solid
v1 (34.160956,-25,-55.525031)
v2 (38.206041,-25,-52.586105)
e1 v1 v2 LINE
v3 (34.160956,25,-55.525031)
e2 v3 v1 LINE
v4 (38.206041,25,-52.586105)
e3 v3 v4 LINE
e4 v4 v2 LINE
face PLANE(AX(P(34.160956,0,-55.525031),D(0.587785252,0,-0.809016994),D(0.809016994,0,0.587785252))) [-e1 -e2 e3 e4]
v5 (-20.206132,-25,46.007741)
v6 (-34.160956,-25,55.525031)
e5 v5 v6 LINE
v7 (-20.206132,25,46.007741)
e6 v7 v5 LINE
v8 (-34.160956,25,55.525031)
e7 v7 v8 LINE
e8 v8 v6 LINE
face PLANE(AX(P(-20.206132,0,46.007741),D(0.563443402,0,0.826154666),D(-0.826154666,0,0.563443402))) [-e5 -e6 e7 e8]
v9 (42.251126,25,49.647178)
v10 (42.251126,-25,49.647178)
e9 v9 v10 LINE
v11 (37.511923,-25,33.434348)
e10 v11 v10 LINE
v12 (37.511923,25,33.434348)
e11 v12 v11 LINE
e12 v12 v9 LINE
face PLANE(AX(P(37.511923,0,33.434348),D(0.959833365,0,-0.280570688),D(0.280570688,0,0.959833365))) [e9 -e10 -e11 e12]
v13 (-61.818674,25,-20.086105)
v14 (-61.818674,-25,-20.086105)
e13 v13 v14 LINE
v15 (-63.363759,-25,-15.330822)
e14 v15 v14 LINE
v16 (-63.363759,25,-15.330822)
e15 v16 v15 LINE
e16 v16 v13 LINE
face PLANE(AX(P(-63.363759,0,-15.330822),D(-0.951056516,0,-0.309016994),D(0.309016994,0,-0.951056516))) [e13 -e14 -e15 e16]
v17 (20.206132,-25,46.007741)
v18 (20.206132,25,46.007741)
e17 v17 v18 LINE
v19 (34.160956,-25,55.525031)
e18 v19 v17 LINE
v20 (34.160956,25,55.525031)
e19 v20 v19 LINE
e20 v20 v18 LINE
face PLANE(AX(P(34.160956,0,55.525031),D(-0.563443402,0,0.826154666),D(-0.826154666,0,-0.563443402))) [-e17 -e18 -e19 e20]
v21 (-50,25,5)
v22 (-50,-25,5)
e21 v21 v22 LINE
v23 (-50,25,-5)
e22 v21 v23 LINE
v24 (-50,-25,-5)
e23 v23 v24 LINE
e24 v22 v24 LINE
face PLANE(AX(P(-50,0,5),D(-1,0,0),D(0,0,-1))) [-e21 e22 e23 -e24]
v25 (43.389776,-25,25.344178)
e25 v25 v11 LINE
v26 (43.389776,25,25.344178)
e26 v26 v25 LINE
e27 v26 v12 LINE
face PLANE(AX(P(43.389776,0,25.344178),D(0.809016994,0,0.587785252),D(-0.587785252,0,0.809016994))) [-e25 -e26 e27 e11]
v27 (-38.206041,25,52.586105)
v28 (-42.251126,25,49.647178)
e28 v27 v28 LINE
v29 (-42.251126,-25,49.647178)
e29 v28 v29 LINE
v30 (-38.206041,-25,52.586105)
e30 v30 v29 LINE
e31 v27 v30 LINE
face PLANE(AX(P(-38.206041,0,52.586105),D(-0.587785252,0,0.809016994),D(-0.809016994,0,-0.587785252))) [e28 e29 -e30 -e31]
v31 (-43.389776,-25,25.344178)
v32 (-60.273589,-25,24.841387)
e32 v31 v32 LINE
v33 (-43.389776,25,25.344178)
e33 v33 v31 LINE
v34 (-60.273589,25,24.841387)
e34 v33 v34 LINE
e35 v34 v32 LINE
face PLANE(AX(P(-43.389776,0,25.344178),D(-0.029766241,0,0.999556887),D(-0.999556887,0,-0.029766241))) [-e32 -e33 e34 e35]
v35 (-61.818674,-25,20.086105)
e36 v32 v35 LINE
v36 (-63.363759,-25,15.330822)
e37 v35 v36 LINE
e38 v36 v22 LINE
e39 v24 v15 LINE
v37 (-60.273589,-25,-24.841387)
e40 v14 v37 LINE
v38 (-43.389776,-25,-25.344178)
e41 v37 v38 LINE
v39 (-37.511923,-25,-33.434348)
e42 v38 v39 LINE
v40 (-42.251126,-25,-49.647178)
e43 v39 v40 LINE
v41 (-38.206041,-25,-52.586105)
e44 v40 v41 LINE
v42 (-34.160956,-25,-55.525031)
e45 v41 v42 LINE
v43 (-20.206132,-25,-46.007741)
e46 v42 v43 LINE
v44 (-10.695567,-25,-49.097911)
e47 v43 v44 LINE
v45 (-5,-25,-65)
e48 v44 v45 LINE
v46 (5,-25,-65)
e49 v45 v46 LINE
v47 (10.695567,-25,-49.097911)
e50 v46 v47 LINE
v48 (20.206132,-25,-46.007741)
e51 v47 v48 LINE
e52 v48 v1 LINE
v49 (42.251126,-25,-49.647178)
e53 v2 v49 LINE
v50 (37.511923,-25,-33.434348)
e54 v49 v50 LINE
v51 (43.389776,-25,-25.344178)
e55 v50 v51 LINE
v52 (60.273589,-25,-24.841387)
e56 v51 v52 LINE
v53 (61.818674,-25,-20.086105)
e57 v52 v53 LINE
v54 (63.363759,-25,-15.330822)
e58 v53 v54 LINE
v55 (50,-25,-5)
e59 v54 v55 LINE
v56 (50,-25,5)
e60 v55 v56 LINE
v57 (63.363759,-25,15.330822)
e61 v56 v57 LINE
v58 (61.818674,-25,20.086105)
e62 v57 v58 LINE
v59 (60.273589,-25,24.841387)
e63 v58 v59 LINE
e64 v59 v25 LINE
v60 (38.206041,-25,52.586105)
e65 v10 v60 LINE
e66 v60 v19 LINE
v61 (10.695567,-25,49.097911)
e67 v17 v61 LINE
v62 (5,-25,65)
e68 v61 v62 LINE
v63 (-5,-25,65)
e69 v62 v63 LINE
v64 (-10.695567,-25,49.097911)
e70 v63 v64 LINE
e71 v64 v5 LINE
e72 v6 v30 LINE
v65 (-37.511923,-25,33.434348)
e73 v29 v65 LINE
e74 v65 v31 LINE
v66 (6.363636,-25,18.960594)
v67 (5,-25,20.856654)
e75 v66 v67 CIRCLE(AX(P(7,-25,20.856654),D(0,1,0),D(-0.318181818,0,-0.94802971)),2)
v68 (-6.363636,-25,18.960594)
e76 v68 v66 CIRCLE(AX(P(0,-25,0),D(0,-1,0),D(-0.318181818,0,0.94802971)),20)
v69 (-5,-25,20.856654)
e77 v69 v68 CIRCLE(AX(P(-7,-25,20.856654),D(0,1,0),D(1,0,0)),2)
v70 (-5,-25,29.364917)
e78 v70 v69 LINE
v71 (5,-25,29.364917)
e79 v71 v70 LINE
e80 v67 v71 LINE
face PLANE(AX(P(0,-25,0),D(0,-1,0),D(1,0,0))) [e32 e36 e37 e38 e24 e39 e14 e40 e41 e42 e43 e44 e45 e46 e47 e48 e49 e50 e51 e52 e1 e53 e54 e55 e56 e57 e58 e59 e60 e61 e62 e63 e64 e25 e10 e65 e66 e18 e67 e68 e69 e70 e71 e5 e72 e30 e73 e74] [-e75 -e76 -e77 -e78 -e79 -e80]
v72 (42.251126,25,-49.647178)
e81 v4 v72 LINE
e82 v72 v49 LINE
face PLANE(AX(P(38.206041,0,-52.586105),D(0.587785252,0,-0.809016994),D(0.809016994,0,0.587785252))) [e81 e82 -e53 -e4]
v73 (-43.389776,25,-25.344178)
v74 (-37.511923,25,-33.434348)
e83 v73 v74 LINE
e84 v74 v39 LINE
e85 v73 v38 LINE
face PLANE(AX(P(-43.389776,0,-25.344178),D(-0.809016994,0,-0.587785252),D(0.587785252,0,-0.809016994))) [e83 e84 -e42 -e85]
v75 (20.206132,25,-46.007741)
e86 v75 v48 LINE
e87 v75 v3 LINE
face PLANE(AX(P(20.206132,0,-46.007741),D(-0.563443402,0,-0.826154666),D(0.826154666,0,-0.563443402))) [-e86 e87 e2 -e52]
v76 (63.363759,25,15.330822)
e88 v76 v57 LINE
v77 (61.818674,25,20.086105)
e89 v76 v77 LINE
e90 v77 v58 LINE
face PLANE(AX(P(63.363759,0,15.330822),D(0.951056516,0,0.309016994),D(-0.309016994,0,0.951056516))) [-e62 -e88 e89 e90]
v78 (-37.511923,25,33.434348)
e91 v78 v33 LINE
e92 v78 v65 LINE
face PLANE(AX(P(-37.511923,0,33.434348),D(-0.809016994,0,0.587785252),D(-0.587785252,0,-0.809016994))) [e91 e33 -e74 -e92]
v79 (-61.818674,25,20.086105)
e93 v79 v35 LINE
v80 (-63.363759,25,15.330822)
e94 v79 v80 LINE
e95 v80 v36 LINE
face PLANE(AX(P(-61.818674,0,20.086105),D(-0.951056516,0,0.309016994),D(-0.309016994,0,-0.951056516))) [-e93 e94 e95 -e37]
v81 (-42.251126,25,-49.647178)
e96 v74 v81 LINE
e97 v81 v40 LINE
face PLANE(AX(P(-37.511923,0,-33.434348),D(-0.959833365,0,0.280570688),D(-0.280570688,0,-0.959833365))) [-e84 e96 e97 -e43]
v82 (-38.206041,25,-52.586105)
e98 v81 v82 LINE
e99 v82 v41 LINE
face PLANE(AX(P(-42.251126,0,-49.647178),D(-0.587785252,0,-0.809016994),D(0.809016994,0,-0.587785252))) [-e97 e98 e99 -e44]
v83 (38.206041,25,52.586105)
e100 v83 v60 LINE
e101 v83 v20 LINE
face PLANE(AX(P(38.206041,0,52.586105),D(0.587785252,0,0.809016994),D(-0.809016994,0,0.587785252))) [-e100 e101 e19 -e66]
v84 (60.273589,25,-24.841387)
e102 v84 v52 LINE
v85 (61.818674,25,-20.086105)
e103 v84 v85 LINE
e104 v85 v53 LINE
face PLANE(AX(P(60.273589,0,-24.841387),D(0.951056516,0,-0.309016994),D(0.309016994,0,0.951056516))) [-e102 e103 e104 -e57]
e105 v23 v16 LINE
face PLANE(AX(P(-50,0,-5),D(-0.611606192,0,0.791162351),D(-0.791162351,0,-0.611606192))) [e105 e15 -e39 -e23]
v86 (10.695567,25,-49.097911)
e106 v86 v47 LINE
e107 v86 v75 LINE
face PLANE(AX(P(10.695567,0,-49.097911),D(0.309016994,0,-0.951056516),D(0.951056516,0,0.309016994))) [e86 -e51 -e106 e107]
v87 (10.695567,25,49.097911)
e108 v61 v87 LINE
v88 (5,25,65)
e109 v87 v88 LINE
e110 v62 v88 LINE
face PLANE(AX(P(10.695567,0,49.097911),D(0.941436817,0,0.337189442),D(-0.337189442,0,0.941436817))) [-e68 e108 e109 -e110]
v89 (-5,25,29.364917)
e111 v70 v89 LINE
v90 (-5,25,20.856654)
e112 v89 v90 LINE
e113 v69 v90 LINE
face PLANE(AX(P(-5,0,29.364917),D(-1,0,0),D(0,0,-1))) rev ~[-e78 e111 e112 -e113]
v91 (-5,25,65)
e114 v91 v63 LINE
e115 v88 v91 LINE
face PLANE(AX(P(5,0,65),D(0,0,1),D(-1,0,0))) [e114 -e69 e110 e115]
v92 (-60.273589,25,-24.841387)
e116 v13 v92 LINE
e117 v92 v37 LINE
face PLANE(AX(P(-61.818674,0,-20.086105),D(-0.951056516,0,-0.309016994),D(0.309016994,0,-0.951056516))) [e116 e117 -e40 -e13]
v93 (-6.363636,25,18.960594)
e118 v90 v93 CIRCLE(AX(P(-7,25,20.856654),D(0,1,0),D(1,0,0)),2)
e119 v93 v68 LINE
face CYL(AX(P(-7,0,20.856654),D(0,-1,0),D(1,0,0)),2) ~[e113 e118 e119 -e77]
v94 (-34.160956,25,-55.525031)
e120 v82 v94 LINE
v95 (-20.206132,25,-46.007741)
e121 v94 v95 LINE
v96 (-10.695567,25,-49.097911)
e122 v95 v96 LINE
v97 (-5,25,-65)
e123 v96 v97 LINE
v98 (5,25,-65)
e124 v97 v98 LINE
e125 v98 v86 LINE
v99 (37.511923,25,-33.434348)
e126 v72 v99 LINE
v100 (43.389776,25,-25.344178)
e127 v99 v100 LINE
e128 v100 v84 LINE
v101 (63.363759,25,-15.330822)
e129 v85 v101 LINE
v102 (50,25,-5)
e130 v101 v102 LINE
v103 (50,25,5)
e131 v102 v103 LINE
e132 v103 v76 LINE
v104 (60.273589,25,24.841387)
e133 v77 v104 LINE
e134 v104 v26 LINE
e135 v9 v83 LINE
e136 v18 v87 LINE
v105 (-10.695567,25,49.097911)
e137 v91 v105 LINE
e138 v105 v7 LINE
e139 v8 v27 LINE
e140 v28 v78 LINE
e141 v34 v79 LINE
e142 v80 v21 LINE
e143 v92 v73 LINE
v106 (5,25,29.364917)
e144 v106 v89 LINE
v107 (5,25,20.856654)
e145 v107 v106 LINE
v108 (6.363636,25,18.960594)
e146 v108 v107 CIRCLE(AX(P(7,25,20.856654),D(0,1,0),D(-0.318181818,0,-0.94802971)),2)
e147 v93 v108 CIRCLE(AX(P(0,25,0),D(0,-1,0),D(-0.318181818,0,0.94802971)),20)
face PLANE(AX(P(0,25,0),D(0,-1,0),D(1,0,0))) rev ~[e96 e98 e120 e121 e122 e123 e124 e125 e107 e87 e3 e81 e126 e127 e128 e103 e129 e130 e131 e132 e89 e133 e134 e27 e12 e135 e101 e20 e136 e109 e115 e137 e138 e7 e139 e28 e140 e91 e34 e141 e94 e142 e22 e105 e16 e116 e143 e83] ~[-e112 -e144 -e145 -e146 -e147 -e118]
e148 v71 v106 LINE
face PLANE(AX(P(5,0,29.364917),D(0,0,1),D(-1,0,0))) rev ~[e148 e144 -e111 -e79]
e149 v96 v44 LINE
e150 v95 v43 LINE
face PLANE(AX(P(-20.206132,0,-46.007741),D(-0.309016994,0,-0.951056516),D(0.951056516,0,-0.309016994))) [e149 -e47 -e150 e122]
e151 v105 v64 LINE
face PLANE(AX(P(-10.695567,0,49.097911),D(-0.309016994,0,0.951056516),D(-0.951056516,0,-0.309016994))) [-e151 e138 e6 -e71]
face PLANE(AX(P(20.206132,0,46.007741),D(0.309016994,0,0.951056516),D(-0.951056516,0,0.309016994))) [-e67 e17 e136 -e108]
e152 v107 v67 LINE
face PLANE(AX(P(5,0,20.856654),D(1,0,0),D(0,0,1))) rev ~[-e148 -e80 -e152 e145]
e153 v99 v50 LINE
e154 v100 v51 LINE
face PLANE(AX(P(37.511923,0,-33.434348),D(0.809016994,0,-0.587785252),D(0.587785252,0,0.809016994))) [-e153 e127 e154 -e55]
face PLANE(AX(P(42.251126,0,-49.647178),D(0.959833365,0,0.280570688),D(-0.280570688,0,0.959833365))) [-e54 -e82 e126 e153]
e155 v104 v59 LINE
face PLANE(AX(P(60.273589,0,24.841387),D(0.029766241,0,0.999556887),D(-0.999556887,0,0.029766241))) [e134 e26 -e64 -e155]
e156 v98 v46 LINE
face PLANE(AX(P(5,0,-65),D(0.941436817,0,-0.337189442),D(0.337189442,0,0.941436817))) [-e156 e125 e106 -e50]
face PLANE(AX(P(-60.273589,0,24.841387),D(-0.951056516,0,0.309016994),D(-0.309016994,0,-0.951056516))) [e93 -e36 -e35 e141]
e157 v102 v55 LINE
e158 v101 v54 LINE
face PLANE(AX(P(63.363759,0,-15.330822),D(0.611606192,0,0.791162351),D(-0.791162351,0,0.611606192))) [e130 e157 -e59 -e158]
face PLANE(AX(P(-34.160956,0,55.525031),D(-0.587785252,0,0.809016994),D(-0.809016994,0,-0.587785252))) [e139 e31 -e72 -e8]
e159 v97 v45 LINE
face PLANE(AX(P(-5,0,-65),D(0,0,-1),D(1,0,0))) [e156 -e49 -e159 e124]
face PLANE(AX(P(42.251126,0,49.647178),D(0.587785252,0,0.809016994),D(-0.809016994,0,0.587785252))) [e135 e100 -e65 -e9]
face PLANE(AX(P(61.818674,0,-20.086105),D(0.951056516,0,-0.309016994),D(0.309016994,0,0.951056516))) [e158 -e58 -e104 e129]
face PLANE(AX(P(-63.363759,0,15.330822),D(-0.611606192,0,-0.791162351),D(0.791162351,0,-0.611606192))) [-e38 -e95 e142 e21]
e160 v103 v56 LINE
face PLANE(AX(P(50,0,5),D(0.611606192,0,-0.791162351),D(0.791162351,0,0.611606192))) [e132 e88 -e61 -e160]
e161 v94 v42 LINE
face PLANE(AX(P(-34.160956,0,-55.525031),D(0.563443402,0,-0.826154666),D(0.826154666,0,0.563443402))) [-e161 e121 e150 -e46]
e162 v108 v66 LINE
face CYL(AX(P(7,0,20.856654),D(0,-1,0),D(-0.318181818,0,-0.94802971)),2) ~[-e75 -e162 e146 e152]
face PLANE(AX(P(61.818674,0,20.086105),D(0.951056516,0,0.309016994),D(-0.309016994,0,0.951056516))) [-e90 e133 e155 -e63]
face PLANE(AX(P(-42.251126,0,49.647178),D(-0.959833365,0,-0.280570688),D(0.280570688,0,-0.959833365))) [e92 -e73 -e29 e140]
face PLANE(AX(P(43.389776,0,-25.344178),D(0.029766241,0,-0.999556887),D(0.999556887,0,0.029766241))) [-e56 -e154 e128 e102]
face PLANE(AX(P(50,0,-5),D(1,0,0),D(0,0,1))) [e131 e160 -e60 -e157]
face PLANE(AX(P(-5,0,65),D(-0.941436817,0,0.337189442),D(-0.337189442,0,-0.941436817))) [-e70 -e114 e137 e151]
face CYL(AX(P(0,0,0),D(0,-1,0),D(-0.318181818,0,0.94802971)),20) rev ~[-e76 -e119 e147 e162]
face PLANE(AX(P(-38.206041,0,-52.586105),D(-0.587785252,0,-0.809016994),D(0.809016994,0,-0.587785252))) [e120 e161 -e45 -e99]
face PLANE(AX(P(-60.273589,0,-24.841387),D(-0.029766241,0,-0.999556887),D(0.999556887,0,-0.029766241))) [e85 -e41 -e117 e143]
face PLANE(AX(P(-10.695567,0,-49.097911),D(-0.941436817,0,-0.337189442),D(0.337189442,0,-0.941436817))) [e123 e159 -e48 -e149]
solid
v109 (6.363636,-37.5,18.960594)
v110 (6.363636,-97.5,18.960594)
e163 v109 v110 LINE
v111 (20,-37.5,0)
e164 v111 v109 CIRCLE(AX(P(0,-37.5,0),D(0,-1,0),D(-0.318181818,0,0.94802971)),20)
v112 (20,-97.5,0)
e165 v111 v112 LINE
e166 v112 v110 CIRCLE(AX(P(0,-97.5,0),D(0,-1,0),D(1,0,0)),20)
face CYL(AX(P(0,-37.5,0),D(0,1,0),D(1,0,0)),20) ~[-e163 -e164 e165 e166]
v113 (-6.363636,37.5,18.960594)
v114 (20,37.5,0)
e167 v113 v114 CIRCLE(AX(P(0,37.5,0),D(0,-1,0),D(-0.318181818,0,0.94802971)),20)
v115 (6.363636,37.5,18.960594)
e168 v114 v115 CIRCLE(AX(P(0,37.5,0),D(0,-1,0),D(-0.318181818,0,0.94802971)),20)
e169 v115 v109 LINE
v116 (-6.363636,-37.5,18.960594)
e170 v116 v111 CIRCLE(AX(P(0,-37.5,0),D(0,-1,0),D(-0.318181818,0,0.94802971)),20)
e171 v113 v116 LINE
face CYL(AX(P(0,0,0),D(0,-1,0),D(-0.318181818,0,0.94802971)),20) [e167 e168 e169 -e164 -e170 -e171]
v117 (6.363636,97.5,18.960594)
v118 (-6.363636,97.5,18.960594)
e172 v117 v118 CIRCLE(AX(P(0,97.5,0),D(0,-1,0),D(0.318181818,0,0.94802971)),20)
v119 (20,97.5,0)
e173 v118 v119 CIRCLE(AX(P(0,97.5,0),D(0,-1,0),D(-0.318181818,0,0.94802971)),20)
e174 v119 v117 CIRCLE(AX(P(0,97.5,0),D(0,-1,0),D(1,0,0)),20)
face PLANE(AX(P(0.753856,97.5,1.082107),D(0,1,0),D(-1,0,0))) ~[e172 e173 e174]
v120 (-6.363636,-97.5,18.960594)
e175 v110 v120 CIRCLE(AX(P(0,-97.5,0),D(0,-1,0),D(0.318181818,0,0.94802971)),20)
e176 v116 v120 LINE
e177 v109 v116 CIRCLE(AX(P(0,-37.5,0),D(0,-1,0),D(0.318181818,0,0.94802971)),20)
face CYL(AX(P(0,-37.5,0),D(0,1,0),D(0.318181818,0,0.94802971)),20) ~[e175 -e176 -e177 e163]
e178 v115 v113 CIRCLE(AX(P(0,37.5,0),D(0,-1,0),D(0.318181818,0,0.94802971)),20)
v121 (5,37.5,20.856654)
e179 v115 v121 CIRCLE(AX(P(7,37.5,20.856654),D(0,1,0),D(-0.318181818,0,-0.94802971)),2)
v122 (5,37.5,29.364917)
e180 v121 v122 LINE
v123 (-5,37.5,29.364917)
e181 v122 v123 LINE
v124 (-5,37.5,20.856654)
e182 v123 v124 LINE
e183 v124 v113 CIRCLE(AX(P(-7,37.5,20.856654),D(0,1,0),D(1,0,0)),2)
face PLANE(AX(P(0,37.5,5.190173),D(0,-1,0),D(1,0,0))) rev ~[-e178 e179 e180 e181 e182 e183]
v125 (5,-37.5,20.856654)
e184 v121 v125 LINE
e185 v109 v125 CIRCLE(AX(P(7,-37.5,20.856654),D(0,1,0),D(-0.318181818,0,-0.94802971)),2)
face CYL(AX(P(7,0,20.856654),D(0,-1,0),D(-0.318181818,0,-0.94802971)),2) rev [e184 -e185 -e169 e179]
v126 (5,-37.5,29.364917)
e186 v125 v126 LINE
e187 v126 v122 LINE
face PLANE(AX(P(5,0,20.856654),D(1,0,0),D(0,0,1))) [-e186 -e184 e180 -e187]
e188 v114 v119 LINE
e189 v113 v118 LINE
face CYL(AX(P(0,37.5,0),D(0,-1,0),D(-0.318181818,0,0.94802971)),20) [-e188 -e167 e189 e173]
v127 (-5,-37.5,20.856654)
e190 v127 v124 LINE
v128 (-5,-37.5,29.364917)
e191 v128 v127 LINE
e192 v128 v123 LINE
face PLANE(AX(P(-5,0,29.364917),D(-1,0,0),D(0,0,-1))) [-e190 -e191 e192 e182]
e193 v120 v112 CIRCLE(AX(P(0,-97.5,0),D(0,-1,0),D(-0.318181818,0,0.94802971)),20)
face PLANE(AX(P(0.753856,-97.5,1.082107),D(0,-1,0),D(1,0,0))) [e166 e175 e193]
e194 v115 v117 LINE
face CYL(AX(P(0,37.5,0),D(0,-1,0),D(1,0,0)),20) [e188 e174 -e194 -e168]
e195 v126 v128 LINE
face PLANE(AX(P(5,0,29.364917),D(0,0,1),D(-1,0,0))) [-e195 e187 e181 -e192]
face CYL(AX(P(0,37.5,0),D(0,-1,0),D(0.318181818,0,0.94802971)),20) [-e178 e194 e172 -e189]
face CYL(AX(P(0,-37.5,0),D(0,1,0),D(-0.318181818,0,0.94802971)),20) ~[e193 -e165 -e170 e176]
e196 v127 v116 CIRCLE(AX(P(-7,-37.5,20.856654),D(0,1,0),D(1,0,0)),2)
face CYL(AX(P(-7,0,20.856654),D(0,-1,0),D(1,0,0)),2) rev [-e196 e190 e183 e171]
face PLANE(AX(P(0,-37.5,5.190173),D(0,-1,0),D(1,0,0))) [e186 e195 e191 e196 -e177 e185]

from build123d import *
from build123d import SkipClean  # not in build123d's __all__

# Parameters (mm, degrees)
F1_DEPTH = 25
F3_DEPTH = 25
F4_DEPTH = 37.5
F6_DEPTH = 60


with BuildPart() as f1:
    # F0 (on Front) → F1 (new body, symmetric)
    with BuildSketch(Plane.XZ):
        Polygon((5, 65), (0, 65), (-5, 65), (-10.6955671373, 49.0979107866), (-20.2061323002, 46.0077408429), (-34.1609564271, 55.5250308958), (-38.206041399, 52.5861046344), (-42.2511263709, 49.6471783729), (-37.5119234573, 33.4343475865), (-43.3897759802, 25.3441776427), (-60.2735885873, 24.8413872158), (-61.8186735592, 20.0861046344), (-63.3637585311, 15.3308220529), (-50, 5), (-50, -5), (-63.3637585311, -15.3308220529), (-61.8186735592, -20.0861046344), (-60.2735885873, -24.8413872158), (-43.3897759802, -25.3441776427), (-37.5119234573, -33.4343475865), (-42.2511263709, -49.6471783729), (-38.206041399, -52.5861046344), (-34.1609564271, -55.5250308958), (-20.2061323002, -46.0077408429), (-10.6955671373, -49.0979107866), (-5, -65), (0, -65), (5, -65), (10.6955671373, -49.0979107866), (20.2061323002, -46.0077408429), (34.1609564271, -55.5250308958), (38.206041399, -52.5861046344), (42.2511263709, -49.6471783729), (37.5119234573, -33.4343475865), (43.3897759802, -25.3441776427), (60.2735885873, -24.8413872158), (61.8186735592, -20.0861046344), (63.3637585311, -15.3308220529), (50, -5), (50, 5), (63.3637585311, 15.3308220529), (61.8186735592, 20.0861046344), (60.2735885873, 24.8413872158), (43.3897759802, 25.3441776427), (37.5119234573, 33.4343475865), (42.2511263709, 49.6471783729), (38.206041399, 52.5861046344), (34.1609564271, 55.5250308958), (20.2061323002, 46.0077408429), (10.6955671373, 49.0979107866), align=None)
    extrude(amount=F1_DEPTH, both=True)

    # F2 (on Front) → F3 (cut, symmetric)
    with BuildSketch(Plane.XZ):
        with BuildLine():
            ThreePointArc((-5, 20.8566536146), (-5.3763117182, 19.6889051984), (-6.3636363636, 18.9605941951))
            ThreePointArc((-6.3636363636, 18.9605941951), (0, -20), (6.3636363636, 18.9605941951))
            ThreePointArc((6.3636363636, 18.9605941951), (5.3763117182, 19.6889051984), (5, 20.8566536146))
            Line((5, 20.8566536146), (5, 29.364916731))
            Line((5, 29.364916731), (-5, 29.364916731))
            Line((-5, 29.364916731), (-5, 20.8566536146))
        make_face()
    extrude(amount=F3_DEPTH, both=True, mode=Mode.SUBTRACT)


with BuildPart() as f4:
    # F2 (on Front) → F4 (new body, symmetric)
    with BuildSketch(Plane.XZ):
        with BuildLine():
            ThreePointArc((-5, 20.8566536146), (-5.3763117182, 19.6889051984), (-6.3636363636, 18.9605941951))
            ThreePointArc((-6.3636363636, 18.9605941951), (0, -20), (6.3636363636, 18.9605941951))
            ThreePointArc((6.3636363636, 18.9605941951), (5.3763117182, 19.6889051984), (5, 20.8566536146))
            Line((5, 20.8566536146), (5, 29.364916731))
            Line((5, 29.364916731), (-5, 29.364916731))
            Line((-5, 29.364916731), (-5, 20.8566536146))
        make_face()
    extrude(amount=F4_DEPTH, both=True)

    # F5 (on face) → F6 (join)
    with BuildSketch(Plane.XZ.offset(37.5)):
        with BuildLine():
            ThreePointArc((-6.3636363636, 18.9605941951), (-11.6774841624, -16.2368828177), (20, 0))
            ThreePointArc((20, 0), (16.2368828177, 11.6774841624), (6.3636363636, 18.9605941951))
            ThreePointArc((6.3636363636, 18.9605941951), (0, 20), (-6.3636363636, 18.9605941951))
        make_face()
    with SkipClean():  # cleaning this boolean's faces spoils the solid; the shape is the same uncleaned
        extrude(amount=F6_DEPTH)

    # F7: F4 across plane


with BuildPart() as f4_1:
    add(f4.part, clean=False)
    with SkipClean():  # cleaning this boolean's faces spoils the solid; the shape is the same uncleaned
        add(f4.part.mirror(Plane.XZ), clean=False)


solid = Compound([f1.part, f4_1.part])
